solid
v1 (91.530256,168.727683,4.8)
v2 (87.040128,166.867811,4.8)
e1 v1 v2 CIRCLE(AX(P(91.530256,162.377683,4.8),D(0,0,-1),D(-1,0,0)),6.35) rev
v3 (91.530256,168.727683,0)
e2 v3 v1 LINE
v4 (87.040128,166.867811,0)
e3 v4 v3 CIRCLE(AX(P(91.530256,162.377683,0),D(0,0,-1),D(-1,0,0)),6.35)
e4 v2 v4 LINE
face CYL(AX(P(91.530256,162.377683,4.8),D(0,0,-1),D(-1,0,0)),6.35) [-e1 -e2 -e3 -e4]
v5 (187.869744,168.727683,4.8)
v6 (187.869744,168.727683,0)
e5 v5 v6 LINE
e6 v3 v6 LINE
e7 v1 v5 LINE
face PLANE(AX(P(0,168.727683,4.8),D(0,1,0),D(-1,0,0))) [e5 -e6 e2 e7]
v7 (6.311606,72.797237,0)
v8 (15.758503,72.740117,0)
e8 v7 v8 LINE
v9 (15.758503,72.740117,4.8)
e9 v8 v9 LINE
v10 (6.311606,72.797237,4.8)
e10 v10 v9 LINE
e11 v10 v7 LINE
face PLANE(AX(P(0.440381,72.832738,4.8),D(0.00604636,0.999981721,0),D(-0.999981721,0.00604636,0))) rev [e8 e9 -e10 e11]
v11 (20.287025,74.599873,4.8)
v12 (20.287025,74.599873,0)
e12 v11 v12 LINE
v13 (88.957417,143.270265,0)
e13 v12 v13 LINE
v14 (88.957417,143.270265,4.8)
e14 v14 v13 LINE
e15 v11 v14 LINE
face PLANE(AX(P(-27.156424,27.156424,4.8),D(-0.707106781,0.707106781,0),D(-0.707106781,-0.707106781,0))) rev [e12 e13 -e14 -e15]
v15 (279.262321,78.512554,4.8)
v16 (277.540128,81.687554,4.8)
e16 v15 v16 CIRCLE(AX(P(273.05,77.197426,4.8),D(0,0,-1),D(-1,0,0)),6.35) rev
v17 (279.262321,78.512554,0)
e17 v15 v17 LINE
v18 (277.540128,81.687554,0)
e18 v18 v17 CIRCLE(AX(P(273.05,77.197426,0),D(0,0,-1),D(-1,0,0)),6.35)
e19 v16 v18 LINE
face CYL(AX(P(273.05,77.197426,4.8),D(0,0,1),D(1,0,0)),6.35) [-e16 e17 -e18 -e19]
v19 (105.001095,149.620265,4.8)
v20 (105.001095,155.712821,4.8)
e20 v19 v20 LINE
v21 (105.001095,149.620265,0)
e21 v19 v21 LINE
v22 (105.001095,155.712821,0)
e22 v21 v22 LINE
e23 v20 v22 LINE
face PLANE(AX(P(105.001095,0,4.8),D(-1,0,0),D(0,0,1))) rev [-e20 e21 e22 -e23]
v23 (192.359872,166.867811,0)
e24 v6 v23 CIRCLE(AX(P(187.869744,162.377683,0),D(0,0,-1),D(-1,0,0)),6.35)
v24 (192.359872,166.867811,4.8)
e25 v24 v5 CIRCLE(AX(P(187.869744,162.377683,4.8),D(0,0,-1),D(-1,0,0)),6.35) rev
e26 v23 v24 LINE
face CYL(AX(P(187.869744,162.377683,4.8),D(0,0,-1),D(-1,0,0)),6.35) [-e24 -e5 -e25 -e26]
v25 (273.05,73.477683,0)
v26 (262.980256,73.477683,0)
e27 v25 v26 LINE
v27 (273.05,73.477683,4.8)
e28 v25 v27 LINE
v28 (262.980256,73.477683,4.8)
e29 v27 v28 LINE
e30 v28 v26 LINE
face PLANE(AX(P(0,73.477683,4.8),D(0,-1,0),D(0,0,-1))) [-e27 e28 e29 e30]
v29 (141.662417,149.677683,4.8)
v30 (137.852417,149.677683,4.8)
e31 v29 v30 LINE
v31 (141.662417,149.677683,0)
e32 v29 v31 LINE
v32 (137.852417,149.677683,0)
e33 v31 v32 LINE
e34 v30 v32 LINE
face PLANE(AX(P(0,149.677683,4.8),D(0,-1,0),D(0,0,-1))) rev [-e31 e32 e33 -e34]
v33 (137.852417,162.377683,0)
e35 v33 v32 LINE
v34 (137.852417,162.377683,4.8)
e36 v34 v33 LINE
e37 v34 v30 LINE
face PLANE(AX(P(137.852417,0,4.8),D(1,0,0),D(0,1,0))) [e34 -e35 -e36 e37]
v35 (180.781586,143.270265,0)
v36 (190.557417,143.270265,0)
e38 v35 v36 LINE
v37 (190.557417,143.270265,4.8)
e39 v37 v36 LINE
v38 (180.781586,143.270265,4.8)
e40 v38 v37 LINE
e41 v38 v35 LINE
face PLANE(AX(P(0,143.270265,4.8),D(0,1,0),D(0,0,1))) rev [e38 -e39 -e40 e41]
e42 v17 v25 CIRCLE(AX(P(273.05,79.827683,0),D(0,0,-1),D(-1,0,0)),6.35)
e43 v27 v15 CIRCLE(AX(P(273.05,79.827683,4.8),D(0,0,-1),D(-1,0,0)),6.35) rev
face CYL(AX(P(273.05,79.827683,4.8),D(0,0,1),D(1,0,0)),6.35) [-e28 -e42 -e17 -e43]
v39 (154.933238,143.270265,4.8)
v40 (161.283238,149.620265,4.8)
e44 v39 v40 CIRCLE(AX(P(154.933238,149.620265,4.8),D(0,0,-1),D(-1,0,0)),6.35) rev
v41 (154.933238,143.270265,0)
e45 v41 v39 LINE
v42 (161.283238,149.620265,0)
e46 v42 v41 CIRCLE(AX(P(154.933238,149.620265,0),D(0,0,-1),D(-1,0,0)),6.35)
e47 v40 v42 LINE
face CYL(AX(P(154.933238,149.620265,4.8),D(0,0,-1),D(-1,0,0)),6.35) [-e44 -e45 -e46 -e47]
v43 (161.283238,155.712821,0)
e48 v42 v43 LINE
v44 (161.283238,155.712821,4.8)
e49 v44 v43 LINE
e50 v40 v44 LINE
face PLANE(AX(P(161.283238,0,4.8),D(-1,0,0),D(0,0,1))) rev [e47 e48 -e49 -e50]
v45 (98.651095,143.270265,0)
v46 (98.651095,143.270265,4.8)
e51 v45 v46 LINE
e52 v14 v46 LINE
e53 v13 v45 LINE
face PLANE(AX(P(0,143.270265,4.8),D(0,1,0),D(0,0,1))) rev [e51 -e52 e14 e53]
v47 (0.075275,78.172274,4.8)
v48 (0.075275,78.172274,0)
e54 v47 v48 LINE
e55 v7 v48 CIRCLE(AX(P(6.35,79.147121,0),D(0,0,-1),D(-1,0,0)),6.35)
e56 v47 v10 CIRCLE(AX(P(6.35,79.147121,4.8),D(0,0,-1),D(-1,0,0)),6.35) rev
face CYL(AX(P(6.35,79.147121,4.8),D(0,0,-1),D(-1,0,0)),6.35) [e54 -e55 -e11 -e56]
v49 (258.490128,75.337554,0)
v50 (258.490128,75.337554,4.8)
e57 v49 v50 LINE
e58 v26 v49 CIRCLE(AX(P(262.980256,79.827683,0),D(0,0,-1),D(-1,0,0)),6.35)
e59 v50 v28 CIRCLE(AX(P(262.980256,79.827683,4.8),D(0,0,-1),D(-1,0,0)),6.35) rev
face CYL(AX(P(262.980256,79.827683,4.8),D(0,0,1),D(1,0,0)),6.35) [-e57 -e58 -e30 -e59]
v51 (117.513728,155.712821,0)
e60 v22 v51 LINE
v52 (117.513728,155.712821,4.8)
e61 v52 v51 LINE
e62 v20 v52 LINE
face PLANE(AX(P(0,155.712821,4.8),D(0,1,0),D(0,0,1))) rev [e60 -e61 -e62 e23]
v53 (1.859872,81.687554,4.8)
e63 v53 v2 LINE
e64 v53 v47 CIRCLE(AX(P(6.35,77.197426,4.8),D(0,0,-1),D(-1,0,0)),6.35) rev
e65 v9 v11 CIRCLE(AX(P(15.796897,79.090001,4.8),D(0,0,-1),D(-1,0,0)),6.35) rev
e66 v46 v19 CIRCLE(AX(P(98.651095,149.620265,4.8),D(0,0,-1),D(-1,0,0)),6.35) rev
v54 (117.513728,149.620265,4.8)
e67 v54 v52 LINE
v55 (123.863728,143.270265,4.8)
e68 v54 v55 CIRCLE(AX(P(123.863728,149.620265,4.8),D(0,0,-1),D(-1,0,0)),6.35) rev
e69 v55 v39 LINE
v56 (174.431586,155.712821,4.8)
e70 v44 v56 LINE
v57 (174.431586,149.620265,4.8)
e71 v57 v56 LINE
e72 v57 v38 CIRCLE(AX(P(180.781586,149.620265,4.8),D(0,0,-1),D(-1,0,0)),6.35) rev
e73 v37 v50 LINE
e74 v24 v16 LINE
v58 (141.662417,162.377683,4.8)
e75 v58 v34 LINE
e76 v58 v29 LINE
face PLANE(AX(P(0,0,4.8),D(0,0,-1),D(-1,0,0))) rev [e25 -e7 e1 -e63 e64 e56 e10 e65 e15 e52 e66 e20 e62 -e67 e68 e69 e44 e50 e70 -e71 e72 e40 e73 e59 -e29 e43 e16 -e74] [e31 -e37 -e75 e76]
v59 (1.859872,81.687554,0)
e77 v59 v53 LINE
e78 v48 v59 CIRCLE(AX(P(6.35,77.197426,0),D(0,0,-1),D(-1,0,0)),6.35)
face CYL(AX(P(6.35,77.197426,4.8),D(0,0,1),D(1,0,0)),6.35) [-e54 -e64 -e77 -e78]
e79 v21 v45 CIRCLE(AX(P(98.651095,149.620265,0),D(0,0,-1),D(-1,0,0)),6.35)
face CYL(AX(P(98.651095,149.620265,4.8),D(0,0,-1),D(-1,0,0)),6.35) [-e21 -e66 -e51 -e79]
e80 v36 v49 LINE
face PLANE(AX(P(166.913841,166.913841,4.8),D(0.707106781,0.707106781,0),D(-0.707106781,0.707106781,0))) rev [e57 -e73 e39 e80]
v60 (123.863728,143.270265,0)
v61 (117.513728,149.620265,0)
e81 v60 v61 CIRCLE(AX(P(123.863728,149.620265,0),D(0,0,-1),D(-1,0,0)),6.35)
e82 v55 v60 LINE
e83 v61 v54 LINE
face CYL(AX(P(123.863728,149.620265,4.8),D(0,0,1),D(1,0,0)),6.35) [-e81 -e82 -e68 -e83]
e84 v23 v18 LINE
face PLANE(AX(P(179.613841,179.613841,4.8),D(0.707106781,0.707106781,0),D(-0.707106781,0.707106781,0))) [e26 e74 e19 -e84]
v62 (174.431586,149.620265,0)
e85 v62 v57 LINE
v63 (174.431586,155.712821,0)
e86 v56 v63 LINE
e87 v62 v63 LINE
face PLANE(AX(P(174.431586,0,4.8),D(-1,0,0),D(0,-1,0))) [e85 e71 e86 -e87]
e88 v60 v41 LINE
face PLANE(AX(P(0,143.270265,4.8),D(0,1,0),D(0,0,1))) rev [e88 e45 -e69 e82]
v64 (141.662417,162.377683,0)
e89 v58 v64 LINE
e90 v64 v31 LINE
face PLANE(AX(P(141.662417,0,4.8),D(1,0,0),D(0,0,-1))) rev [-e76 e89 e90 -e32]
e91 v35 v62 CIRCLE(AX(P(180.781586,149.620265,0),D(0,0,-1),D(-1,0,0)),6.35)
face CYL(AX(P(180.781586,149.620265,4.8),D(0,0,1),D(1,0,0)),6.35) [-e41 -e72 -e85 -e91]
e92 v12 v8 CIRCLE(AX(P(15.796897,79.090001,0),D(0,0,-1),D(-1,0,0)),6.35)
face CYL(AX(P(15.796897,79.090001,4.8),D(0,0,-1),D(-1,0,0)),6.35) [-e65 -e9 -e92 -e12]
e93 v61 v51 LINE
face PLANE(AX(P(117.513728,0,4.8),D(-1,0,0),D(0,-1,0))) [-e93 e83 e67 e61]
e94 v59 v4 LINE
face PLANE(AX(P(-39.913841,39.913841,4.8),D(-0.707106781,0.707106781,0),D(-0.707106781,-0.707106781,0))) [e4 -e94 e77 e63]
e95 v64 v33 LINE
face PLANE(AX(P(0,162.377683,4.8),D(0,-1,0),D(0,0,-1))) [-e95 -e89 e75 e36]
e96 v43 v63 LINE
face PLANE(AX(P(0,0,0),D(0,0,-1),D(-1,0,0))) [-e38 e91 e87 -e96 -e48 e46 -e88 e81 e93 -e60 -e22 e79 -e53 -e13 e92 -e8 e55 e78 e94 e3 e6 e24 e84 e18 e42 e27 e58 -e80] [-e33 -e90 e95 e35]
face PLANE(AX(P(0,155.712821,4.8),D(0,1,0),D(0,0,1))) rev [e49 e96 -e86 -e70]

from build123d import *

# Parameters (mm, degrees)
SKETCH1_W           = 279.4
SKETCH1_H           = 254
BOSS_EXTRUDE1_DEPTH = 4.800000052
SKETCH4_W           = 13.148347957
SKETCH4_H           = 12.442555781
SKETCH4_W_2         = 3.81
SKETCH4_H_2         = 12.7
SKETCH4_W_3         = 12.512633495
CUT_EXTRUDE1_DEPTH  = 378.628653575
FILLET1_R           = 6.35


with BuildPart() as part:
    # Sketch1 → Boss-Extrude1 (new body)
    with BuildSketch(Plane.XY):
        with Locations((139.7, 127)):
            Rectangle(SKETCH1_W, SKETCH1_H)
    extrude(amount=BOSS_EXTRUDE1_DEPTH)

    # Sketch4 → Cut-Extrude1 (cut, through all)
    with BuildSketch(Plane(origin=(0, 0, 0), x_dir=(-1, 0, 0), z_dir=(0, 0, -1))):
        Polygon((0, 0), (0, 72.835400266), (-18.411229684, 72.724077305), (-88.95741747, 143.27026509), (-105.001094941, 143.27026509), (-117.513728436, 143.27026509), (-161.28323771, 143.27026509), (-174.431585667, 143.27026509), (-190.55741747, 143.27026509), (-260.35, 73.47768256), (-279.4, 73.47768256), (-279.4, 0), align=None)
        Polygon((-88.9, 168.72768256), (0, 79.82768256), (0, 254), (-279.4, 254), (-279.4, 79.82768256), (-190.5, 168.72768256), align=None)
        with Locations((-167.857411689, 149.491542981)):
            Rectangle(SKETCH4_W, SKETCH4_H)
        with Locations((-139.75741747, 156.02768256)):
            Rectangle(SKETCH4_W_2, SKETCH4_H_2)
        with Locations((-111.257411689, 149.491542981)):
            Rectangle(SKETCH4_W_3, SKETCH4_H)
    extrude(amount=-CUT_EXTRUDE1_DEPTH, mode=Mode.SUBTRACT)

    # Fillet1
    # the kernel refuses this fillet: 6.35 mm, written as the material it takes off along each edge
    with BuildSketch(Plane(origin=(105.001094941, 143.27026509, -15.875), x_dir=(0, 1, 0), z_dir=(0, 0, 1)), Plane(origin=(279.4, 73.47768256, -15.875), x_dir=(0, 1, 0), z_dir=(0, 0, 1)), Plane(origin=(174.431585667, 143.27026509, -15.875), x_dir=(1, 0, 0), z_dir=(0, 0, 1)), Plane(origin=(161.28323771, 143.27026509, -15.875), x_dir=(0, 1, 0), z_dir=(0, 0, 1)), Plane(origin=(117.513728436, 143.27026509, -15.875), x_dir=(1, 0, 0), z_dir=(0, 0, 1))) as fillet1_piece_1:
        with BuildLine():
            CenterArc((FILLET1_R, FILLET1_R), FILLET1_R, 180, 90)
            Line((0, FILLET1_R), (0, 0))
            Line((0, 0), (FILLET1_R, 0))
        make_face()
    extrude(amount=36.550000052, mode=Mode.SUBTRACT)
    with BuildSketch(Plane(origin=(18.411229684, 72.724077305, -6.631938595), x_dir=(-0.9999817205970539, 0.006046360207229539, 0), z_dir=(0, 0, 1))) as fillet1_piece_2:
        with BuildLine():
            CenterArc((FILLET1_R * 0.41775991148, -FILLET1_R), FILLET1_R, 90, 45.346433032)
            Line((-FILLET1_R * 0.293609366521, -FILLET1_R * 0.297181566607), (0, 0))
            Line((0, 0), (FILLET1_R * 0.41775991148, 0))
        make_face()
    extrude(amount=18.063877241, mode=Mode.SUBTRACT)
    with BuildSketch(Plane(origin=(0, 72.835400266, -15.779302468), x_dir=(0, 1, 0), z_dir=(0, 0, 1))) as fillet1_piece_3:
        with BuildLine():
            CenterArc((FILLET1_R * 0.993971809004, -FILLET1_R), FILLET1_R, 90, 89.653566968)
            Line((-FILLET1_R * 0.00600991159307, -FILLET1_R * 0.993953639793), (0, 0))
            Line((0, 0), (FILLET1_R * 0.993971809004, 0))
        make_face()
    extrude(amount=36.358604988, mode=Mode.SUBTRACT)
    with BuildSketch(Plane(origin=(260.35, 73.47768256, -6.575640303), x_dir=(1, 0, 0), z_dir=(0, 0, 1)), Plane(origin=(190.5, 168.72768256, -6.575640303), x_dir=(-1, 0, 0), z_dir=(0, 0, 1)), Plane(origin=(279.4, 79.82768256, -6.575640303), x_dir=(-0.7071067811865475, 0.7071067811865475, 0), z_dir=(0, 0, 1)), Plane(origin=(0, 79.82768256, -6.575640303), x_dir=(0, -1, 0), z_dir=(0, 0, 1)), Plane(origin=(88.9, 168.72768256, -6.575640303), x_dir=(-0.7071067811865476, -0.7071067811865476, 0), z_dir=(0, 0, 1))) as fillet1_piece_4:
        with BuildLine():
            CenterArc((FILLET1_R * 0.414213562373, FILLET1_R), FILLET1_R, 225, 45)
            Line((-FILLET1_R * 0.292893218813, FILLET1_R * 0.292893218813), (0, 0))
            Line((0, 0), (FILLET1_R * 0.414213562373, 0))
        make_face()
    extrude(amount=17.951280657, mode=Mode.SUBTRACT)


solid = part.part
